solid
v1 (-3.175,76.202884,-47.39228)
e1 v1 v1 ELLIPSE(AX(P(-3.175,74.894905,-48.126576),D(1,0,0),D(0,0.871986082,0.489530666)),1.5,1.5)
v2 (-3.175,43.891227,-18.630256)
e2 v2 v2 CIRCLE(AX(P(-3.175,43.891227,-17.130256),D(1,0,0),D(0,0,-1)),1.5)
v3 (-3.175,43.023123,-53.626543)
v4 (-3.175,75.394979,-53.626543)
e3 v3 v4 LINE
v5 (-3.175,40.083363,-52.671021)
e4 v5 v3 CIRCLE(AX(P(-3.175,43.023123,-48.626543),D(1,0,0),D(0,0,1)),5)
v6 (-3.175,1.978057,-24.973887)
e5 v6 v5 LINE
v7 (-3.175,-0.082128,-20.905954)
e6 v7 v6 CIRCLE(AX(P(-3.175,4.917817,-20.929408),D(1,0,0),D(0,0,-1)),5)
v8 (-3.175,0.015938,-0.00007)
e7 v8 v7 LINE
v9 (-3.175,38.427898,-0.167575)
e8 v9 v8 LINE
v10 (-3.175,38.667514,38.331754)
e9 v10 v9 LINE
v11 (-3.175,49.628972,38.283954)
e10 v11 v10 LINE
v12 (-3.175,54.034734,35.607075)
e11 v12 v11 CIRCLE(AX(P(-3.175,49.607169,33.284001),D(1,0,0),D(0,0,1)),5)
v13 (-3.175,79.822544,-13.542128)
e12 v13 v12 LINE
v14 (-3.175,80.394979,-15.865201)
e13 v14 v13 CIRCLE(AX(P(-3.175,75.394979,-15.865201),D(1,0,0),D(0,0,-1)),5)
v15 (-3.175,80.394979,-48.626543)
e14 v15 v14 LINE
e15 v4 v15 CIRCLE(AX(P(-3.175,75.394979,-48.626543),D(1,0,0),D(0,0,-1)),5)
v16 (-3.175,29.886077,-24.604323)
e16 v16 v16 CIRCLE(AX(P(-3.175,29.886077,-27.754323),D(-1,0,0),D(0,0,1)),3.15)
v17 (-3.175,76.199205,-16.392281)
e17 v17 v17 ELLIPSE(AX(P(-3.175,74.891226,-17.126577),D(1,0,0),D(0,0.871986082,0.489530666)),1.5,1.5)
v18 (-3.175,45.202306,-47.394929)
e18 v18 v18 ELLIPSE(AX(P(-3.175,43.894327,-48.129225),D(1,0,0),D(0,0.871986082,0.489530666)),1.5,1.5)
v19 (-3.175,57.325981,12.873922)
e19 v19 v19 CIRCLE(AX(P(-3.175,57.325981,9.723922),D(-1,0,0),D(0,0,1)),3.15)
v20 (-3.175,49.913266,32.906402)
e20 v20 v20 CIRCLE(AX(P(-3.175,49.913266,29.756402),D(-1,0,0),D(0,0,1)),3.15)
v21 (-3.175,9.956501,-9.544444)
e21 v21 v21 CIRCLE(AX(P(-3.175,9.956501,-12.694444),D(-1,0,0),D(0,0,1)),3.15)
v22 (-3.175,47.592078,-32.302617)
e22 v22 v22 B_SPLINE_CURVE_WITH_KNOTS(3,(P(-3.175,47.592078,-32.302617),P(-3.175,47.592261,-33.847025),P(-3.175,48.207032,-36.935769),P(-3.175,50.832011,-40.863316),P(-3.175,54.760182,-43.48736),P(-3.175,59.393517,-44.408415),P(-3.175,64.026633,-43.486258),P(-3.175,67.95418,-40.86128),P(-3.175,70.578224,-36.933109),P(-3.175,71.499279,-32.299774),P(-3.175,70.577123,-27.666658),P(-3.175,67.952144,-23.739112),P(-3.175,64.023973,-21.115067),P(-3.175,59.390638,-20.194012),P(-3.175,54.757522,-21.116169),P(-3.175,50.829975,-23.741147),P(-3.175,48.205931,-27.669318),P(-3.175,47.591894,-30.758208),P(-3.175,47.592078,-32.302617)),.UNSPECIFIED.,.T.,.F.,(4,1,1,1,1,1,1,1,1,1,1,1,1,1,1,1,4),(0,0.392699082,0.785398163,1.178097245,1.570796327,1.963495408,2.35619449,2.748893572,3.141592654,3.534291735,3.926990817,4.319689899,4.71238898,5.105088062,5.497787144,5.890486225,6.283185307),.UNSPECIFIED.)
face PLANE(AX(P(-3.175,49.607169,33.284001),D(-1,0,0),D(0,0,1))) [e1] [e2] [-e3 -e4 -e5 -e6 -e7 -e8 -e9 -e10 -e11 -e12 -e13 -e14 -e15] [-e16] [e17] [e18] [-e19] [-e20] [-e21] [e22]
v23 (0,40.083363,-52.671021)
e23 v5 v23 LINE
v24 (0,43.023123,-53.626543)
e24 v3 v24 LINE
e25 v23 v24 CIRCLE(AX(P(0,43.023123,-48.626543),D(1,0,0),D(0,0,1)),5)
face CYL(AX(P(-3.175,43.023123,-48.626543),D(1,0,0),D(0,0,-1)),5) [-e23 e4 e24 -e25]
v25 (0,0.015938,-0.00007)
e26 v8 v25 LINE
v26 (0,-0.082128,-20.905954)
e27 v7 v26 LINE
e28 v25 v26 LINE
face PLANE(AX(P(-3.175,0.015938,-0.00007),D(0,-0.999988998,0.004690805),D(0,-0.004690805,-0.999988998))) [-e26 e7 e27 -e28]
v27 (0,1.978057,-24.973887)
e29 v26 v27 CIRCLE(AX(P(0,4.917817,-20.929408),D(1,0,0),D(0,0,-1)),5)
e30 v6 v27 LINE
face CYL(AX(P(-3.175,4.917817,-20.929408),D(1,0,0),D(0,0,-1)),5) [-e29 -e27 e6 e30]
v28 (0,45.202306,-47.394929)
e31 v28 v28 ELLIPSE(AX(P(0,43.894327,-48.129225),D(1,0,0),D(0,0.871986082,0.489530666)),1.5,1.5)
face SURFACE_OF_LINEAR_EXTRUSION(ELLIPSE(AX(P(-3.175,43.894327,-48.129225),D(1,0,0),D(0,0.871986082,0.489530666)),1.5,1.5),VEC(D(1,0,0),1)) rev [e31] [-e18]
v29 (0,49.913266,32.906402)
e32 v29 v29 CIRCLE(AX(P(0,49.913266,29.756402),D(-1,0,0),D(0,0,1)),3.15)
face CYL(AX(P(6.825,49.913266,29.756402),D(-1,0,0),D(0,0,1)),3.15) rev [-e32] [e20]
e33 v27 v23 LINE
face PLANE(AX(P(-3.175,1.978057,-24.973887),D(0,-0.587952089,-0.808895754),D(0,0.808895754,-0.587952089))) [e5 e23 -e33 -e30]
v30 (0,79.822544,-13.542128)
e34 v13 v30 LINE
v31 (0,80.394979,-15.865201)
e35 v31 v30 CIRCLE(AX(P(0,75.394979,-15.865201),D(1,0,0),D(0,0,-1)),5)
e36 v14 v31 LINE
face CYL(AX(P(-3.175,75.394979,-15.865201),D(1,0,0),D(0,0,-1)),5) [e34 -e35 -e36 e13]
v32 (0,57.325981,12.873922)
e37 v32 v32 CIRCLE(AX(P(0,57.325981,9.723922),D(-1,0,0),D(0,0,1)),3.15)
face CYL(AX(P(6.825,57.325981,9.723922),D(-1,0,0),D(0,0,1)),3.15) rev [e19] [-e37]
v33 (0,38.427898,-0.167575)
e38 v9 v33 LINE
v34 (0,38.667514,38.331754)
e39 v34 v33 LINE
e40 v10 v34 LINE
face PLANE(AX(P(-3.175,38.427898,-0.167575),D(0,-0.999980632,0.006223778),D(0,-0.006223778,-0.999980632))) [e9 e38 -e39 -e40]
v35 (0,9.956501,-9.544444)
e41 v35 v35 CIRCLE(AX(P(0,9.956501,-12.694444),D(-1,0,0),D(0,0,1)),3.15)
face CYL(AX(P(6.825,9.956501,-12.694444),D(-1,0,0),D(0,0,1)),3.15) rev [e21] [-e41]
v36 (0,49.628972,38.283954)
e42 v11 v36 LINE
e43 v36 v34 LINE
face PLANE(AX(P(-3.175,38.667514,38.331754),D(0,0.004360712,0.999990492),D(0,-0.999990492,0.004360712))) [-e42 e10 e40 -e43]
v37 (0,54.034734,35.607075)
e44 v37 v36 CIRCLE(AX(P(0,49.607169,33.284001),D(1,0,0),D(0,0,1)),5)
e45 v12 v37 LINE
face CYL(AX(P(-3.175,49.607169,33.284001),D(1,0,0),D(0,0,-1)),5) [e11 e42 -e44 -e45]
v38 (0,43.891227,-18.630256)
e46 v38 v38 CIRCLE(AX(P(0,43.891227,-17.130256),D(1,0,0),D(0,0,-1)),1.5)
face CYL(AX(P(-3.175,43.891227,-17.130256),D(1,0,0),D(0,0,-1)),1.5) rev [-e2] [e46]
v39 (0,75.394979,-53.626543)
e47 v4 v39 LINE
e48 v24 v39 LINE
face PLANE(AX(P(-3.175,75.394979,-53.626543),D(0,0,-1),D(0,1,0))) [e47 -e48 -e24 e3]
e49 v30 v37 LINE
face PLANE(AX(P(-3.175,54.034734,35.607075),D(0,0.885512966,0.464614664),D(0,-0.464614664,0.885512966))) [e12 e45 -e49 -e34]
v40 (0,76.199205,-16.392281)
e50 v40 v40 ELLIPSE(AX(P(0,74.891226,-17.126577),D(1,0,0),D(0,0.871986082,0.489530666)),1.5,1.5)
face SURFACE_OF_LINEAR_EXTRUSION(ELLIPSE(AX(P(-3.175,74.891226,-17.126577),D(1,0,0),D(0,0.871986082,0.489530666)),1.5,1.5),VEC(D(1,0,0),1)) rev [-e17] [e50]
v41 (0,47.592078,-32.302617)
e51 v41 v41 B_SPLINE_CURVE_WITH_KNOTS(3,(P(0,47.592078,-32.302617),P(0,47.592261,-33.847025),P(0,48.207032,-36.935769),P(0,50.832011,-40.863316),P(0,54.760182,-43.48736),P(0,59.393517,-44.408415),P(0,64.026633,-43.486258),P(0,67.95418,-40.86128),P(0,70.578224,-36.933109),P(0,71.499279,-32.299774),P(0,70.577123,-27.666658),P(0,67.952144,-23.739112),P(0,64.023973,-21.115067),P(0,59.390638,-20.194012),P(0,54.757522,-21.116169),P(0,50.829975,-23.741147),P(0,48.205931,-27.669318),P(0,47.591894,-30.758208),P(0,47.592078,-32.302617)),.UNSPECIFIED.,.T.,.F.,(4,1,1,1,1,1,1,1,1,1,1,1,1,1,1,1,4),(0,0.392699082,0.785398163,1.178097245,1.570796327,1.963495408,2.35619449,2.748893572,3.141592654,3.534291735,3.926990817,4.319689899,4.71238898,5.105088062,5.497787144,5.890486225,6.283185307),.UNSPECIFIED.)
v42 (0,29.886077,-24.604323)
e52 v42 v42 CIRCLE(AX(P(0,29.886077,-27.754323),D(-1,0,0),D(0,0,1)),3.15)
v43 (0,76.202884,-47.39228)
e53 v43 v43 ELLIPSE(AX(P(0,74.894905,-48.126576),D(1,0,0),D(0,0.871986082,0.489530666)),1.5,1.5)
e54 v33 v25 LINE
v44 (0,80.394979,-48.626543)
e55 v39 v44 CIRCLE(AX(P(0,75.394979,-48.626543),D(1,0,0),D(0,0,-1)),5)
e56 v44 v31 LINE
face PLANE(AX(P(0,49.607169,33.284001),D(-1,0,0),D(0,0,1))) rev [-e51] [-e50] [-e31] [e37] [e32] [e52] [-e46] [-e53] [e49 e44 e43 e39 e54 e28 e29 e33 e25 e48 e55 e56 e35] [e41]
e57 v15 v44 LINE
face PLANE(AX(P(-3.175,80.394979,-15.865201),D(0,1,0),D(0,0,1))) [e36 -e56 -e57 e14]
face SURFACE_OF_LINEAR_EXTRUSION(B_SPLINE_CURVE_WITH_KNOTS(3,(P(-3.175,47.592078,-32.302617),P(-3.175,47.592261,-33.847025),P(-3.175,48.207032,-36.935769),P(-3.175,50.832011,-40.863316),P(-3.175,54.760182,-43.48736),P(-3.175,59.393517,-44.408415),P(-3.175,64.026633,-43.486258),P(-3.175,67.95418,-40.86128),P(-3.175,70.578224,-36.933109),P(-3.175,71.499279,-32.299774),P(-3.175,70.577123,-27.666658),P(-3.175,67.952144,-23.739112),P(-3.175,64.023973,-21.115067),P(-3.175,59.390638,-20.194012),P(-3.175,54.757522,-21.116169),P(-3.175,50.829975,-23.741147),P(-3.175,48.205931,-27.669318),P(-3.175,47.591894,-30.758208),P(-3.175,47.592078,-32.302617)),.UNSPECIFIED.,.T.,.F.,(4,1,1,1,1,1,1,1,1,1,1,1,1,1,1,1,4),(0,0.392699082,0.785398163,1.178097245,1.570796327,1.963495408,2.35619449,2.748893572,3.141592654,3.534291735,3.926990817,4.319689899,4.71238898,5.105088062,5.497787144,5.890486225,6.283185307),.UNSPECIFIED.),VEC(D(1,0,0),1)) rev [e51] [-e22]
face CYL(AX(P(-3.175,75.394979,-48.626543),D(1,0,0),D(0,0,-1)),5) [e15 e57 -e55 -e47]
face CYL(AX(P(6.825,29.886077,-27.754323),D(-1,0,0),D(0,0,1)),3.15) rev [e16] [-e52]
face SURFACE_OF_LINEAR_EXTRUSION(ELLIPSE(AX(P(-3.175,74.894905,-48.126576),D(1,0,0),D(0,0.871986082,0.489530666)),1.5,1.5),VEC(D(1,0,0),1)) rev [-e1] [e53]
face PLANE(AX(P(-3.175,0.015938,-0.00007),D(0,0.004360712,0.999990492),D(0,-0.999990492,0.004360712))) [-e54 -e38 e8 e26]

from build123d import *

# Parameters (mm, degrees)
SKETCH1_R          = 1.5
SKETCH1_RX         = 1.5
SKETCH1_RY         = 1.499999958
BASE_FLANGE1_DEPTH = 3.175
SKETCH2_R          = 3.15
CUT_EXTRUDE1_DEPTH = 10


# Sheet-metal steps are written as plain solids
with BuildPart() as part:
    # Sketch1 → Base-Flange1 (new body)
    with BuildSketch(Plane(origin=(0, 0, 0), x_dir=(0, 0, -1), z_dir=(1, 0, 0))):
        with BuildLine():
            Line((15.865201272, 80.394978876), (48.626542571, 80.394978876))
            ThreePointArc((48.626542571, 80.394978876), (52.162076477, 78.930512782), (53.626542571, 75.394978876))
            Line((53.626542571, 75.394978876), (53.626542571, 43.023123453))
            ThreePointArc((53.626542571, 43.023123453), (53.381665801, 41.477548132), (52.671021343, 40.083363009))
            Line((52.671021343, 40.083363009), (24.97388681, 1.978056535))
            ThreePointArc((24.97388681, 1.978056535), (23.188445465, 0.457239672), (20.905954013, -0.082128012))
            Line((20.905954013, -0.082128012), (6.9504e-05, 0.015938493))
            Line((6.9504e-05, 0.015938493), (0.167574588, 38.427897973))
            Line((0.167574588, 38.427897973), (-38.331753926, 38.667513874))
            Line((-38.331753926, 38.667513874), (-38.283953708, 49.628972315))
            ThreePointArc((-38.283953708, 49.628972315), (-37.557098456, 52.203443057), (-35.60707457, 54.034733587))
            Line((-35.60707457, 54.034733587), (13.54212795, 79.822543708))
            ThreePointArc((13.54212795, 79.822543708), (14.668920402, 80.249761269), (15.865201272, 80.394978876))
        make_face()
        with Locations((17.130255889, 43.891226665)):
            Circle(SKETCH1_R, mode=Mode.SUBTRACT)
        with Locations(Location((48.129224581, 43.894326732), (0, 0, 119.309738267))):
            Ellipse(SKETCH1_RX, SKETCH1_RY, mode=Mode.SUBTRACT)
        with Locations(Location((17.126576602, 74.891226239), (0, 0, 119.309738267))):
            Ellipse(SKETCH1_RX, SKETCH1_RY, mode=Mode.SUBTRACT)
        with Locations(Location((48.126575725, 74.894904787), (0, 0, 119.309738267))):
            Ellipse(SKETCH1_RX, SKETCH1_RY, mode=Mode.SUBTRACT)
        with BuildLine():
            add(Edge.make_bspline(
                [(32.302616578, 47.592077565), (33.84702501, 47.592261157), (36.935768822, 48.207032249), (40.863315512, 50.83201062), (43.487359793, 54.760181559), (44.408414716, 59.393516648), (43.486258021, 64.026632625), (40.861279703, 67.954179586), (36.93310891, 70.578224108), (32.299774036, 71.499279195), (27.666658318, 70.577122557), (23.739111629, 67.952144186), (21.115067347, 64.023973247), (20.194012424, 59.390638157), (21.116169119, 54.75752218), (23.741147438, 50.82997522), (27.669318231, 48.205930698), (30.758208146, 47.591893973), (32.302616578, 47.592077565)],
                knots=[0, 0, 0, 0, 0.392699082, 0.785398163, 1.178097245, 1.570796327, 1.963495408, 2.35619449, 2.748893572, 3.141592654, 3.534291735, 3.926990817, 4.319689899, 4.71238898, 5.105088062, 5.497787144, 5.890486225, 6.283185307, 6.283185307, 6.283185307, 6.283185307], degree=3))
        make_face(mode=Mode.SUBTRACT)
    extrude(amount=-BASE_FLANGE1_DEPTH)

    # Sketch2 → Cut-Extrude1 (cut)
    with BuildSketch(Plane(origin=(-3.175, -854.244613751, -1311.587435239), x_dir=(0, 0, 1), z_dir=(-1, 0, 0))):
        with Locations((1283.833112159, 884.130691082)):
            Circle(SKETCH2_R)
        with Locations((1298.892990926, 864.201114773)):
            Circle(SKETCH2_R)
        with Locations((1341.343837435, 904.15787978)):
            Circle(SKETCH2_R)
        with Locations((1321.311357388, 911.570594384)):
            Circle(SKETCH2_R)
    extrude(amount=-CUT_EXTRUDE1_DEPTH, mode=Mode.SUBTRACT)


solid = part.part
